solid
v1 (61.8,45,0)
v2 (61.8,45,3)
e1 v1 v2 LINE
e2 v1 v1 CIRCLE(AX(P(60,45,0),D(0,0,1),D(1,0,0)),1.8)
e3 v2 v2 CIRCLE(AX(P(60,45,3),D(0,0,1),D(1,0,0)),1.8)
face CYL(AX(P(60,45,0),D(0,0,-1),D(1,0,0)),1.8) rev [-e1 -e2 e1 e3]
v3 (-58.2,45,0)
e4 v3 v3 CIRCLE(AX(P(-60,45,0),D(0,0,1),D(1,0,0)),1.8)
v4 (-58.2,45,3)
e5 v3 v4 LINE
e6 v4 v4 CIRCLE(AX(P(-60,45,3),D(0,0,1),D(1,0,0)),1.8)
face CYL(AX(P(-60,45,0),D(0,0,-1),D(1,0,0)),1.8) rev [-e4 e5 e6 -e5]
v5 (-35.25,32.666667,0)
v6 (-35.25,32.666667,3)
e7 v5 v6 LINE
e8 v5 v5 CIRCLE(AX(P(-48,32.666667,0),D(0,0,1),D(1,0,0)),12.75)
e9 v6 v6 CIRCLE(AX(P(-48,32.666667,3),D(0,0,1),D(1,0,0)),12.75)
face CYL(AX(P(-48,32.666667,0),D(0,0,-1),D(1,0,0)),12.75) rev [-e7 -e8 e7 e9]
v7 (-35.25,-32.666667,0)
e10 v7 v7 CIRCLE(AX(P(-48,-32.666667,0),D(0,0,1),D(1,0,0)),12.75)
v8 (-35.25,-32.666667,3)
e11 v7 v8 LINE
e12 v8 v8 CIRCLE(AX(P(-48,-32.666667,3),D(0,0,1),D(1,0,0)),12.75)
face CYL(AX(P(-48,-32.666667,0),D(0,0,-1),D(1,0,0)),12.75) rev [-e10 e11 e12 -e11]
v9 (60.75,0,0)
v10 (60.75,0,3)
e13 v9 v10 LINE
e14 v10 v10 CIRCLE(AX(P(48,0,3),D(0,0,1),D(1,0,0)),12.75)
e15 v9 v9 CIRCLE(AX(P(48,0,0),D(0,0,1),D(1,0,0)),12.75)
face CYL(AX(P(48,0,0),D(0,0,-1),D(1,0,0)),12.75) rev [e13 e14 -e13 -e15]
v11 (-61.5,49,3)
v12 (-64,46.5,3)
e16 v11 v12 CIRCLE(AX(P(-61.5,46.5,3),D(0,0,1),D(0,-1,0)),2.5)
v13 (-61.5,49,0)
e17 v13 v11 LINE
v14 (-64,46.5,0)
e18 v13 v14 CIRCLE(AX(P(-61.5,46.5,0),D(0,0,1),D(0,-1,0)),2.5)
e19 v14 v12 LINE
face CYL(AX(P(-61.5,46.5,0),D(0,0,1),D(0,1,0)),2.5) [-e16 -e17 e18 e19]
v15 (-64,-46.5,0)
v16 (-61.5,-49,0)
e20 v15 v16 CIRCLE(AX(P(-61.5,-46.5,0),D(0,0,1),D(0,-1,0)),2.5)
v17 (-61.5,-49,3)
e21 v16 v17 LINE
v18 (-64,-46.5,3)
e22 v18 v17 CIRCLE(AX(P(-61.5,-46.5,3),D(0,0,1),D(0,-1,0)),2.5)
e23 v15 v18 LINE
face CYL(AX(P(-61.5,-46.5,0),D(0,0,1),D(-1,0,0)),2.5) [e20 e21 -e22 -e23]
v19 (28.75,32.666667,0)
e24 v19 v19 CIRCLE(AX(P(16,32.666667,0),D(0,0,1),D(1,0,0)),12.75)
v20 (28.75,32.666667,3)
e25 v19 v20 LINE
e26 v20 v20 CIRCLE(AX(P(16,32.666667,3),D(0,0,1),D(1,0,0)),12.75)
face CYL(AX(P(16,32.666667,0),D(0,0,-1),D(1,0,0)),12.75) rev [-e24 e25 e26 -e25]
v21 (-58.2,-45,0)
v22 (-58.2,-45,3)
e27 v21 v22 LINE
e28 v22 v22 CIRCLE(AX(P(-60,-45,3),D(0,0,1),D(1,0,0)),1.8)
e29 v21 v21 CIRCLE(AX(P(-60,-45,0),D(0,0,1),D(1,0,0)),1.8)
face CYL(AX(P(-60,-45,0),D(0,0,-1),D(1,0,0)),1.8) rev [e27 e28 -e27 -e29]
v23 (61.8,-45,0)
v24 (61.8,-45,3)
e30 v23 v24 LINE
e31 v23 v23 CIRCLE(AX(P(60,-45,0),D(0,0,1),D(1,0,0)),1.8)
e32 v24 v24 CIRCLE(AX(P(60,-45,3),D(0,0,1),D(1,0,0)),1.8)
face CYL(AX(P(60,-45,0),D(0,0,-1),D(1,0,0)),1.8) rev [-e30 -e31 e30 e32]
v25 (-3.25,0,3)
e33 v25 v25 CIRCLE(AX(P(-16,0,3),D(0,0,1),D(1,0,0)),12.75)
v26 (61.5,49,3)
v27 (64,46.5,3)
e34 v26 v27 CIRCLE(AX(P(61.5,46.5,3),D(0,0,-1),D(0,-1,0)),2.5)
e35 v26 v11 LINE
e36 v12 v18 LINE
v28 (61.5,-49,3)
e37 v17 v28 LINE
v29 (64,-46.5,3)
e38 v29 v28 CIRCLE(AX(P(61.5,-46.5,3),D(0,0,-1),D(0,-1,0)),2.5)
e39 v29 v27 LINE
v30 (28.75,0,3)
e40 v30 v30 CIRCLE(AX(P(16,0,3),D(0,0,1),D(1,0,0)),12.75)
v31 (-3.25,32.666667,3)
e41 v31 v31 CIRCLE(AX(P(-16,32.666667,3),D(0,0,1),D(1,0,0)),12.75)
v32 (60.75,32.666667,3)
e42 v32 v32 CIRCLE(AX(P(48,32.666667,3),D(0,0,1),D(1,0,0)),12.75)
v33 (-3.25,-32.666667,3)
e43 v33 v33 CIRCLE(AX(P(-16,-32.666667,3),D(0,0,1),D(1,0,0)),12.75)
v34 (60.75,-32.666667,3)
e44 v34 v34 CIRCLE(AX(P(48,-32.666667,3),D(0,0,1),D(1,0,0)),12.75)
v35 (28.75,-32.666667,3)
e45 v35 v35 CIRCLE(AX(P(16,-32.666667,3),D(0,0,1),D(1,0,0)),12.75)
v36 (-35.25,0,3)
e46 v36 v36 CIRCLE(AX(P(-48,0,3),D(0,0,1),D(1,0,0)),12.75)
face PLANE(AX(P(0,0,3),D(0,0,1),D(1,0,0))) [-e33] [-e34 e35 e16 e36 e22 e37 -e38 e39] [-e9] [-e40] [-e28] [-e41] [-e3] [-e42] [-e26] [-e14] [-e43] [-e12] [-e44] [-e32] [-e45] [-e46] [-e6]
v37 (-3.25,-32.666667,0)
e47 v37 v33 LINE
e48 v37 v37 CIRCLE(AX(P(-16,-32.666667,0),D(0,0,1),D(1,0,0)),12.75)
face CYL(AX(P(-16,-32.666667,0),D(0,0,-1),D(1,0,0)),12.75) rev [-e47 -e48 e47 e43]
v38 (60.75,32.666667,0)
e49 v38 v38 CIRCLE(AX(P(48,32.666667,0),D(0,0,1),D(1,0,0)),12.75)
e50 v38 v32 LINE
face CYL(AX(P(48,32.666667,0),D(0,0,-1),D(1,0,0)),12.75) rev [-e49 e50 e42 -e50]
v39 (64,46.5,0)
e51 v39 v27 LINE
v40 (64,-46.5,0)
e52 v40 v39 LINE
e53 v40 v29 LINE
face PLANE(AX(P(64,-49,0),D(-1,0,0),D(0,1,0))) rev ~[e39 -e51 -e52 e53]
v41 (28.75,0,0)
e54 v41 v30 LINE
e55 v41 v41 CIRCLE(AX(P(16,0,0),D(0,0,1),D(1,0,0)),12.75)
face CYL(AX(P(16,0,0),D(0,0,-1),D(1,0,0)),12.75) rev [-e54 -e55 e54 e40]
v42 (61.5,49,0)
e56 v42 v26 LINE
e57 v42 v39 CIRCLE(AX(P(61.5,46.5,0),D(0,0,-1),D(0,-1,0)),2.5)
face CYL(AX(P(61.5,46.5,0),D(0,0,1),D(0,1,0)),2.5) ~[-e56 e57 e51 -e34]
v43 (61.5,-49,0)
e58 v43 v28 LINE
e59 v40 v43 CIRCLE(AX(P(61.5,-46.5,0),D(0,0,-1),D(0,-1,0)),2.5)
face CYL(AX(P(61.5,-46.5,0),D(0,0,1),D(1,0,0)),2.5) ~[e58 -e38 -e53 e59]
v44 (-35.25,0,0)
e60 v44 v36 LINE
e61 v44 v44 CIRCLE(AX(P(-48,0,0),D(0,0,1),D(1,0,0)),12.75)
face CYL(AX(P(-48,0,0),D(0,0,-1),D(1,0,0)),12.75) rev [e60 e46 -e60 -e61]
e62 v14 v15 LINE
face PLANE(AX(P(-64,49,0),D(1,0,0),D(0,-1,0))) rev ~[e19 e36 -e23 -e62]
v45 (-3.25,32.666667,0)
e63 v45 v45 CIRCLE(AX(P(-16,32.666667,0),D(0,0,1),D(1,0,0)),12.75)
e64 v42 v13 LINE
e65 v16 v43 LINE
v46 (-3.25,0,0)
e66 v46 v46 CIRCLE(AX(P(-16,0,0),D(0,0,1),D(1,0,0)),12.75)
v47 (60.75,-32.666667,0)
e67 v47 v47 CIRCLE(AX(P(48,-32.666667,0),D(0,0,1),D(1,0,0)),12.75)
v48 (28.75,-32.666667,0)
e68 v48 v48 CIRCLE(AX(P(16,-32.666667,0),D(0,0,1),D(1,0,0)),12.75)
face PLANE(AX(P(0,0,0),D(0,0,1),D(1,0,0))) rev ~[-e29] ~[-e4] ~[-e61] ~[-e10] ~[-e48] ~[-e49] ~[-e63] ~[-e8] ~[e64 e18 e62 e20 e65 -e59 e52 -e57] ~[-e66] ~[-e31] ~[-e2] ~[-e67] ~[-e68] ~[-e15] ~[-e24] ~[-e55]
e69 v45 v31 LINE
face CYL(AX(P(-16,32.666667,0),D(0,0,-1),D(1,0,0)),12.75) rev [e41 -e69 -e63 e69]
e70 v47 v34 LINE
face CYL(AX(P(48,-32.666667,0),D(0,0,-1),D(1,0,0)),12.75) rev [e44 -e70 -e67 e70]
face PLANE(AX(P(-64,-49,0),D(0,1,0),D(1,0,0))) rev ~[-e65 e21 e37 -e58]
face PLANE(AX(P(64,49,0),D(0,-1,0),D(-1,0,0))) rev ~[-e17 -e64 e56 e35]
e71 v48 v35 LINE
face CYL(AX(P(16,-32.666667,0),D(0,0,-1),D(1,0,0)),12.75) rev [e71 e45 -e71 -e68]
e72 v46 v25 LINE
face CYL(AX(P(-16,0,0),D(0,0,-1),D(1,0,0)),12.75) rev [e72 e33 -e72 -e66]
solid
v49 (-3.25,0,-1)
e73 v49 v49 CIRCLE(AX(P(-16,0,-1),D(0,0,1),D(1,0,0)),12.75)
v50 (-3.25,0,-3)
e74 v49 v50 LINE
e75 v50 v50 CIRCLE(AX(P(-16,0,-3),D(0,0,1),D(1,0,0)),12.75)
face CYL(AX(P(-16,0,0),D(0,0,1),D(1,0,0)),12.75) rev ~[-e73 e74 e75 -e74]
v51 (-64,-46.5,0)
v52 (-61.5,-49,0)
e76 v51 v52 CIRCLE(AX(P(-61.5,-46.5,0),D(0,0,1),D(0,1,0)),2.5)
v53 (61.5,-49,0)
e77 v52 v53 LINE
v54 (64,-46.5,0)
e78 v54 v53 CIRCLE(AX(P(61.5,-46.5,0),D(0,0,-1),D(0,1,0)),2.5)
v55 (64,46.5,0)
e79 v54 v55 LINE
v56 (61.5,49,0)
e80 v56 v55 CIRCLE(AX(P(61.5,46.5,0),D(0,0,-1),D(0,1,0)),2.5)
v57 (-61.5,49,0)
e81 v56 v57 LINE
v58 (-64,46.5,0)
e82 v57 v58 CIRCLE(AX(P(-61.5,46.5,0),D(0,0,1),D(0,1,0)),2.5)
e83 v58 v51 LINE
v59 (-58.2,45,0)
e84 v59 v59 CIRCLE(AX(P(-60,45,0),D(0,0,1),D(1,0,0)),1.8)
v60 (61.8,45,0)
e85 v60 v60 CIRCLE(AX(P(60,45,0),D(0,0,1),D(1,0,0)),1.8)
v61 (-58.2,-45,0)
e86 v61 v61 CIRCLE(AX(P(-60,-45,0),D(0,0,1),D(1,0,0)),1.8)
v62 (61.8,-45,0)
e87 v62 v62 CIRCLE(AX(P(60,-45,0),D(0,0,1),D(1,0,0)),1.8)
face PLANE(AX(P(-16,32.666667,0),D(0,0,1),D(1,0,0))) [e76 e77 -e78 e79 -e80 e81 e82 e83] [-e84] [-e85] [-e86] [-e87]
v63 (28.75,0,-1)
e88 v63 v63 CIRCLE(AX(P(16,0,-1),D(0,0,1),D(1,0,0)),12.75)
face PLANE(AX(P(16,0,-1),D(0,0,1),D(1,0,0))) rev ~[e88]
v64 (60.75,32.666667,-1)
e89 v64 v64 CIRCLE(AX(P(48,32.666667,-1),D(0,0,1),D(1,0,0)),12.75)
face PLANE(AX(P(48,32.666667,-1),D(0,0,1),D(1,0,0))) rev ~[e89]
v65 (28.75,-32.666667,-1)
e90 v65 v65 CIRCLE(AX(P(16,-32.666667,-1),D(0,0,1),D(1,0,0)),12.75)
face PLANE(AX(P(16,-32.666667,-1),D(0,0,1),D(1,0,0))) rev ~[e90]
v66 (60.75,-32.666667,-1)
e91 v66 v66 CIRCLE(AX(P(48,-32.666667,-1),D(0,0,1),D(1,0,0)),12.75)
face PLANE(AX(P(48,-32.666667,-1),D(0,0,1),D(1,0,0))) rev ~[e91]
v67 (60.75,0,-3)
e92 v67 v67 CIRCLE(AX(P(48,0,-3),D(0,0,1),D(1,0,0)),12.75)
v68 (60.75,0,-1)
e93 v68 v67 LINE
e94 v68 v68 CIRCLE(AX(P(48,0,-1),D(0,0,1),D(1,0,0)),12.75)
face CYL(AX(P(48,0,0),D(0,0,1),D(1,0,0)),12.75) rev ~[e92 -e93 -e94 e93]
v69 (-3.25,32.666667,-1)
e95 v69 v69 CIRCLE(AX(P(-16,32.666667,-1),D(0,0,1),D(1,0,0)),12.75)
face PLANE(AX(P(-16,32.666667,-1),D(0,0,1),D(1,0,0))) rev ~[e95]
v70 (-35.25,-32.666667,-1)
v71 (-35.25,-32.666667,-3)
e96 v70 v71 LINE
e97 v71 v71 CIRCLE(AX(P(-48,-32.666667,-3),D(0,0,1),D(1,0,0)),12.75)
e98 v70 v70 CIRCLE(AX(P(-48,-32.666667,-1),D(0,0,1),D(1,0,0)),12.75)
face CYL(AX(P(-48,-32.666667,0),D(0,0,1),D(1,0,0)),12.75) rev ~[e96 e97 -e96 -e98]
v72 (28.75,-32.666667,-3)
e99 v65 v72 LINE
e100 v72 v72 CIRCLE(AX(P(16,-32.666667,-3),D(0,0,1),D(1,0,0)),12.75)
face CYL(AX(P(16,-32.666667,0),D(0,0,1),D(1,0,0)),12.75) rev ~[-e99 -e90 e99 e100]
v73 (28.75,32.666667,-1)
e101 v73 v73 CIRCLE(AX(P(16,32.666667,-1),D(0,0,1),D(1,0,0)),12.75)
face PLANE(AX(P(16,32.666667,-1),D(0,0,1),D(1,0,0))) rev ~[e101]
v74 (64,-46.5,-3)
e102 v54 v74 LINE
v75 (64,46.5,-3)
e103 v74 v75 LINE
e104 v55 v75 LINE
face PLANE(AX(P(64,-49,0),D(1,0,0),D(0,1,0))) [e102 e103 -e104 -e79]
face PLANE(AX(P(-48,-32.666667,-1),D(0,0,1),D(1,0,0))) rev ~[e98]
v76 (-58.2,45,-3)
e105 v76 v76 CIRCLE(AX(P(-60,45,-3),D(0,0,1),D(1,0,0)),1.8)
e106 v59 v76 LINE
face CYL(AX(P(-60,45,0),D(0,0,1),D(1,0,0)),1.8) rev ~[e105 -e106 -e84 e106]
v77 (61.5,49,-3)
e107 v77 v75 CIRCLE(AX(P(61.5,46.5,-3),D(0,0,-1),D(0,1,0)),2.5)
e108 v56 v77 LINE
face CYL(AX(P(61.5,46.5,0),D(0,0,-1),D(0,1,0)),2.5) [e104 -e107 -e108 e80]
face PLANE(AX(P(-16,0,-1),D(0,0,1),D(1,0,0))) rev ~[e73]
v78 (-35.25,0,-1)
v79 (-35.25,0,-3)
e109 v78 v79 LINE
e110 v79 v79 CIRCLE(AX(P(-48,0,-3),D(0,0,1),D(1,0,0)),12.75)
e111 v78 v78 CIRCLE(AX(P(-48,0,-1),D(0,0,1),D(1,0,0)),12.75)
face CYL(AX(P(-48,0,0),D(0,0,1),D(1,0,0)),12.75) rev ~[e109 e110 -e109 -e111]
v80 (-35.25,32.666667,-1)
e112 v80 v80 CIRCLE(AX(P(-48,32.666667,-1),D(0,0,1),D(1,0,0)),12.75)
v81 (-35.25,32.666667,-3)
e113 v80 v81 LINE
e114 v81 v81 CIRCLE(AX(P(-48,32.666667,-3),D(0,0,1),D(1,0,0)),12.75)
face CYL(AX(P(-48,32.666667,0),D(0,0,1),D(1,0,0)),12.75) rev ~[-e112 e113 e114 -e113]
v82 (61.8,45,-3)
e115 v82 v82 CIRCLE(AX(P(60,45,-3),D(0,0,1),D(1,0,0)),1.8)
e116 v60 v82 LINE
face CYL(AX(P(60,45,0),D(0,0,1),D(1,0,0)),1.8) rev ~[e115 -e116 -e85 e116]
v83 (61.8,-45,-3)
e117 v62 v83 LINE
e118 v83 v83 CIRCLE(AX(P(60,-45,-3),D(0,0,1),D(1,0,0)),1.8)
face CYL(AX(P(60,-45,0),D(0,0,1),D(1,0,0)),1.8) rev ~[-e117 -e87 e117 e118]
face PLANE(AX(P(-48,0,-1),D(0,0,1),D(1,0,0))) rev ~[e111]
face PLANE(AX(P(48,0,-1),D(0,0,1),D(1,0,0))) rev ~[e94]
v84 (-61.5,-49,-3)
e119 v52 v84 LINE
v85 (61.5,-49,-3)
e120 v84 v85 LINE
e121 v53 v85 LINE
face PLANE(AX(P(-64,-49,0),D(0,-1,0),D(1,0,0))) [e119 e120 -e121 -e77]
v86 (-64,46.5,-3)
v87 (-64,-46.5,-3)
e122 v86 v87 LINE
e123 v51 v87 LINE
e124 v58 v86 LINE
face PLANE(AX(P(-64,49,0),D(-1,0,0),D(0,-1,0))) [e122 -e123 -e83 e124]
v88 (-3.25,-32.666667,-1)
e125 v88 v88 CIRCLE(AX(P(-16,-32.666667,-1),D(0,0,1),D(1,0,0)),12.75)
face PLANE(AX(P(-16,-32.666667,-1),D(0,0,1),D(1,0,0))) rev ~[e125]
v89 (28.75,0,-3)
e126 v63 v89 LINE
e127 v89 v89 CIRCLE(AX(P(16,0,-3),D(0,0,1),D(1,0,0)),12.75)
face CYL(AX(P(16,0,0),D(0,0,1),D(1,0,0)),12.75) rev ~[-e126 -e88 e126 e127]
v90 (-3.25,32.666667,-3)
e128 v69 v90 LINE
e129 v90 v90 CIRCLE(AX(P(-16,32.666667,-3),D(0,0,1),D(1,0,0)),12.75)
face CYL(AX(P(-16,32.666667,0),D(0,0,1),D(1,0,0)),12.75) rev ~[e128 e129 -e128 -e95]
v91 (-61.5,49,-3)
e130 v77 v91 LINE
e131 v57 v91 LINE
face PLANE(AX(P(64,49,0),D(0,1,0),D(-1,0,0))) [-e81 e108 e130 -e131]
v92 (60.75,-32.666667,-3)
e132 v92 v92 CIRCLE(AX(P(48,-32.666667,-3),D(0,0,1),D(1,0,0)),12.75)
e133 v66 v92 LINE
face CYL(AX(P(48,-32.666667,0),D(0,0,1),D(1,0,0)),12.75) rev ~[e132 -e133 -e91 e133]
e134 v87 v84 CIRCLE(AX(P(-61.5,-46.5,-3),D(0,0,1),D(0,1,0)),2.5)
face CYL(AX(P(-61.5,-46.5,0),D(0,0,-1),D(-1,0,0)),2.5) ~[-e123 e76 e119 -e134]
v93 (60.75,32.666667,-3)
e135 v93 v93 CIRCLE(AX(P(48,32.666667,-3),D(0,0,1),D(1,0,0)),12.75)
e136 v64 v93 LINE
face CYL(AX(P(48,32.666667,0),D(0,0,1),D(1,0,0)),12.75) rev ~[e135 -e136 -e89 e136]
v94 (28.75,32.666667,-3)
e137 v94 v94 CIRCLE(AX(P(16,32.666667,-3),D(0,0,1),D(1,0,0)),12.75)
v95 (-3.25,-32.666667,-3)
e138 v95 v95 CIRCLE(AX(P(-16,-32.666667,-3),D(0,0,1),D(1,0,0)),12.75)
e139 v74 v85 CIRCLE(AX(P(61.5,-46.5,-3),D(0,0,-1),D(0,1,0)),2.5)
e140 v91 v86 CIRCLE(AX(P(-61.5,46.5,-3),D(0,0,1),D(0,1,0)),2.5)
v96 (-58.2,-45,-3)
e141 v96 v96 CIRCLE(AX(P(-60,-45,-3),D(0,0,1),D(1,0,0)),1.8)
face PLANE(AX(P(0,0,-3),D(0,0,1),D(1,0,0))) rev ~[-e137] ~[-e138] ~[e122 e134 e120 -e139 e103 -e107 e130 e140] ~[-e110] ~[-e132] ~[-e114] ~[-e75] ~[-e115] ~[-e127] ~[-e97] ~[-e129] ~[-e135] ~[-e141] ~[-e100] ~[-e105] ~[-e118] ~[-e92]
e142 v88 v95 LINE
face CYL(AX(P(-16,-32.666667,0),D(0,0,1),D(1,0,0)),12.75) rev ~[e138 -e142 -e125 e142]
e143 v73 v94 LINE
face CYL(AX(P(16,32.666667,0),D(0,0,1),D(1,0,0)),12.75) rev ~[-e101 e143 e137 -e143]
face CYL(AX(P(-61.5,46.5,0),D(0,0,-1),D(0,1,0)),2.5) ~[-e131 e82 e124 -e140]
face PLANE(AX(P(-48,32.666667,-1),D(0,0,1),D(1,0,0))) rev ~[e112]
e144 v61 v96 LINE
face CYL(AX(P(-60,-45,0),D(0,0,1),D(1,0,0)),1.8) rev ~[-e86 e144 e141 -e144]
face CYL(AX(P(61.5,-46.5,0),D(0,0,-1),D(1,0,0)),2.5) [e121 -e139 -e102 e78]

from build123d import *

# Parameters (mm, degrees)
F1_R     = 1.8
F1_R_2   = 12.75
F2_DEPTH = 3
F3_DEPTH = 3
F4_DEPTH = 1
F5_R     = 2.5
F5_2_R   = 2.5


with BuildPart() as f2:
    # F1 (on Top) → F2 (new body)
    with BuildSketch(Plane.XY):
        Polygon((64, 37.2020410289), (64, 49), (52.2020410289, 49), (-54, 49), (-64, 49), (-64, 39), (-64, -39), (-64, -49), (-54, -49), (54, -49), (64, -49), (64, -39), align=None)
        with Locations((-60, -45)):
            Circle(F1_R, mode=Mode.SUBTRACT)
        with Locations((-48, -32.6666666667)):
            Circle(F1_R_2, mode=Mode.SUBTRACT)
        with Locations((-16, -32.6666666667)):
            Circle(F1_R_2, mode=Mode.SUBTRACT)
        with Locations((16, -32.6666666667)):
            Circle(F1_R_2, mode=Mode.SUBTRACT)
        with Locations((60, -45)):
            Circle(F1_R, mode=Mode.SUBTRACT)
        with Locations((48, -32.6666666667)):
            Circle(F1_R_2, mode=Mode.SUBTRACT)
        with Locations((-48, 0)):
            Circle(F1_R_2, mode=Mode.SUBTRACT)
        with Locations((-16, 0)):
            Circle(F1_R_2, mode=Mode.SUBTRACT)
        with Locations((-48, 32.6666666667)):
            Circle(F1_R_2, mode=Mode.SUBTRACT)
        with Locations((-60, 45)):
            Circle(F1_R, mode=Mode.SUBTRACT)
        with Locations((-16, 32.6666666667)):
            Circle(F1_R_2, mode=Mode.SUBTRACT)
        with Locations((16, 0)):
            Circle(F1_R_2, mode=Mode.SUBTRACT)
        with Locations((48, 0)):
            Circle(F1_R_2, mode=Mode.SUBTRACT)
        with Locations((16, 32.6666666667)):
            Circle(F1_R_2, mode=Mode.SUBTRACT)
        with Locations((48, 32.6666666667)):
            Circle(F1_R_2, mode=Mode.SUBTRACT)
        with Locations((60, 45)):
            Circle(F1_R, mode=Mode.SUBTRACT)
    extrude(amount=F2_DEPTH)

    # F5
    f5_edges = [f2.edges().sort_by_distance(p)[0] for p in [
        (-64, 49, 1.5),
        (-64, -49, 1.5),
        (64, -49, 1.5),
        (64, 49, 1.5),
    ]]
    fillet(f5_edges, radius=F5_R)


with BuildPart() as f3:
    # F1 (on Top) → F3 (new body)
    with BuildSketch(Plane.XY):
        Polygon((64, 37.2020410289), (64, 49), (52.2020410289, 49), (-54, 49), (-64, 49), (-64, 39), (-64, -39), (-64, -49), (-54, -49), (54, -49), (64, -49), (64, -39), align=None)
        with Locations((-60, -45)):
            Circle(F1_R, mode=Mode.SUBTRACT)
        with Locations((-48, -32.6666666667)):
            Circle(F1_R_2, mode=Mode.SUBTRACT)
        with Locations((-16, -32.6666666667)):
            Circle(F1_R_2, mode=Mode.SUBTRACT)
        with Locations((16, -32.6666666667)):
            Circle(F1_R_2, mode=Mode.SUBTRACT)
        with Locations((60, -45)):
            Circle(F1_R, mode=Mode.SUBTRACT)
        with Locations((48, -32.6666666667)):
            Circle(F1_R_2, mode=Mode.SUBTRACT)
        with Locations((-48, 0)):
            Circle(F1_R_2, mode=Mode.SUBTRACT)
        with Locations((-16, 0)):
            Circle(F1_R_2, mode=Mode.SUBTRACT)
        with Locations((-48, 32.6666666667)):
            Circle(F1_R_2, mode=Mode.SUBTRACT)
        with Locations((-60, 45)):
            Circle(F1_R, mode=Mode.SUBTRACT)
        with Locations((-16, 32.6666666667)):
            Circle(F1_R_2, mode=Mode.SUBTRACT)
        with Locations((16, 0)):
            Circle(F1_R_2, mode=Mode.SUBTRACT)
        with Locations((48, 0)):
            Circle(F1_R_2, mode=Mode.SUBTRACT)
        with Locations((16, 32.6666666667)):
            Circle(F1_R_2, mode=Mode.SUBTRACT)
        with Locations((48, 32.6666666667)):
            Circle(F1_R_2, mode=Mode.SUBTRACT)
        with Locations((60, 45)):
            Circle(F1_R, mode=Mode.SUBTRACT)
    extrude(amount=-F3_DEPTH)

    # F1 (on Top) → F4 (join)
    with BuildSketch(Plane.XY):
        with Locations((-16, 32.6666666667)):
            Circle(F1_R_2)
        with Locations((-16, 0)):
            Circle(F1_R_2)
        with Locations((-16, -32.6666666667)):
            Circle(F1_R_2)
        with Locations((-48, -32.6666666667)):
            Circle(F1_R_2)
        with Locations((-48, 0)):
            Circle(F1_R_2)
        with Locations((-48, 32.6666666667)):
            Circle(F1_R_2)
        with Locations((16, 32.6666666667)):
            Circle(F1_R_2)
        with Locations((16, 0)):
            Circle(F1_R_2)
        with Locations((16, -32.6666666667)):
            Circle(F1_R_2)
        with Locations((48, 32.6666666667)):
            Circle(F1_R_2)
        with Locations((48, 0)):
            Circle(F1_R_2)
        with Locations((48, -32.6666666667)):
            Circle(F1_R_2)
    extrude(amount=-F4_DEPTH)

    # F5#2
    f5_2_edges = [f3.edges().sort_by_distance(p)[0] for p in [
        (-64, 49, -1.5),
        (-64, -49, -1.5),
        (64, -49, -1.5),
        (64, 49, -1.5),
    ]]
    fillet(f5_2_edges, radius=F5_2_R)


solid = Compound([f2.part, f3.part])
